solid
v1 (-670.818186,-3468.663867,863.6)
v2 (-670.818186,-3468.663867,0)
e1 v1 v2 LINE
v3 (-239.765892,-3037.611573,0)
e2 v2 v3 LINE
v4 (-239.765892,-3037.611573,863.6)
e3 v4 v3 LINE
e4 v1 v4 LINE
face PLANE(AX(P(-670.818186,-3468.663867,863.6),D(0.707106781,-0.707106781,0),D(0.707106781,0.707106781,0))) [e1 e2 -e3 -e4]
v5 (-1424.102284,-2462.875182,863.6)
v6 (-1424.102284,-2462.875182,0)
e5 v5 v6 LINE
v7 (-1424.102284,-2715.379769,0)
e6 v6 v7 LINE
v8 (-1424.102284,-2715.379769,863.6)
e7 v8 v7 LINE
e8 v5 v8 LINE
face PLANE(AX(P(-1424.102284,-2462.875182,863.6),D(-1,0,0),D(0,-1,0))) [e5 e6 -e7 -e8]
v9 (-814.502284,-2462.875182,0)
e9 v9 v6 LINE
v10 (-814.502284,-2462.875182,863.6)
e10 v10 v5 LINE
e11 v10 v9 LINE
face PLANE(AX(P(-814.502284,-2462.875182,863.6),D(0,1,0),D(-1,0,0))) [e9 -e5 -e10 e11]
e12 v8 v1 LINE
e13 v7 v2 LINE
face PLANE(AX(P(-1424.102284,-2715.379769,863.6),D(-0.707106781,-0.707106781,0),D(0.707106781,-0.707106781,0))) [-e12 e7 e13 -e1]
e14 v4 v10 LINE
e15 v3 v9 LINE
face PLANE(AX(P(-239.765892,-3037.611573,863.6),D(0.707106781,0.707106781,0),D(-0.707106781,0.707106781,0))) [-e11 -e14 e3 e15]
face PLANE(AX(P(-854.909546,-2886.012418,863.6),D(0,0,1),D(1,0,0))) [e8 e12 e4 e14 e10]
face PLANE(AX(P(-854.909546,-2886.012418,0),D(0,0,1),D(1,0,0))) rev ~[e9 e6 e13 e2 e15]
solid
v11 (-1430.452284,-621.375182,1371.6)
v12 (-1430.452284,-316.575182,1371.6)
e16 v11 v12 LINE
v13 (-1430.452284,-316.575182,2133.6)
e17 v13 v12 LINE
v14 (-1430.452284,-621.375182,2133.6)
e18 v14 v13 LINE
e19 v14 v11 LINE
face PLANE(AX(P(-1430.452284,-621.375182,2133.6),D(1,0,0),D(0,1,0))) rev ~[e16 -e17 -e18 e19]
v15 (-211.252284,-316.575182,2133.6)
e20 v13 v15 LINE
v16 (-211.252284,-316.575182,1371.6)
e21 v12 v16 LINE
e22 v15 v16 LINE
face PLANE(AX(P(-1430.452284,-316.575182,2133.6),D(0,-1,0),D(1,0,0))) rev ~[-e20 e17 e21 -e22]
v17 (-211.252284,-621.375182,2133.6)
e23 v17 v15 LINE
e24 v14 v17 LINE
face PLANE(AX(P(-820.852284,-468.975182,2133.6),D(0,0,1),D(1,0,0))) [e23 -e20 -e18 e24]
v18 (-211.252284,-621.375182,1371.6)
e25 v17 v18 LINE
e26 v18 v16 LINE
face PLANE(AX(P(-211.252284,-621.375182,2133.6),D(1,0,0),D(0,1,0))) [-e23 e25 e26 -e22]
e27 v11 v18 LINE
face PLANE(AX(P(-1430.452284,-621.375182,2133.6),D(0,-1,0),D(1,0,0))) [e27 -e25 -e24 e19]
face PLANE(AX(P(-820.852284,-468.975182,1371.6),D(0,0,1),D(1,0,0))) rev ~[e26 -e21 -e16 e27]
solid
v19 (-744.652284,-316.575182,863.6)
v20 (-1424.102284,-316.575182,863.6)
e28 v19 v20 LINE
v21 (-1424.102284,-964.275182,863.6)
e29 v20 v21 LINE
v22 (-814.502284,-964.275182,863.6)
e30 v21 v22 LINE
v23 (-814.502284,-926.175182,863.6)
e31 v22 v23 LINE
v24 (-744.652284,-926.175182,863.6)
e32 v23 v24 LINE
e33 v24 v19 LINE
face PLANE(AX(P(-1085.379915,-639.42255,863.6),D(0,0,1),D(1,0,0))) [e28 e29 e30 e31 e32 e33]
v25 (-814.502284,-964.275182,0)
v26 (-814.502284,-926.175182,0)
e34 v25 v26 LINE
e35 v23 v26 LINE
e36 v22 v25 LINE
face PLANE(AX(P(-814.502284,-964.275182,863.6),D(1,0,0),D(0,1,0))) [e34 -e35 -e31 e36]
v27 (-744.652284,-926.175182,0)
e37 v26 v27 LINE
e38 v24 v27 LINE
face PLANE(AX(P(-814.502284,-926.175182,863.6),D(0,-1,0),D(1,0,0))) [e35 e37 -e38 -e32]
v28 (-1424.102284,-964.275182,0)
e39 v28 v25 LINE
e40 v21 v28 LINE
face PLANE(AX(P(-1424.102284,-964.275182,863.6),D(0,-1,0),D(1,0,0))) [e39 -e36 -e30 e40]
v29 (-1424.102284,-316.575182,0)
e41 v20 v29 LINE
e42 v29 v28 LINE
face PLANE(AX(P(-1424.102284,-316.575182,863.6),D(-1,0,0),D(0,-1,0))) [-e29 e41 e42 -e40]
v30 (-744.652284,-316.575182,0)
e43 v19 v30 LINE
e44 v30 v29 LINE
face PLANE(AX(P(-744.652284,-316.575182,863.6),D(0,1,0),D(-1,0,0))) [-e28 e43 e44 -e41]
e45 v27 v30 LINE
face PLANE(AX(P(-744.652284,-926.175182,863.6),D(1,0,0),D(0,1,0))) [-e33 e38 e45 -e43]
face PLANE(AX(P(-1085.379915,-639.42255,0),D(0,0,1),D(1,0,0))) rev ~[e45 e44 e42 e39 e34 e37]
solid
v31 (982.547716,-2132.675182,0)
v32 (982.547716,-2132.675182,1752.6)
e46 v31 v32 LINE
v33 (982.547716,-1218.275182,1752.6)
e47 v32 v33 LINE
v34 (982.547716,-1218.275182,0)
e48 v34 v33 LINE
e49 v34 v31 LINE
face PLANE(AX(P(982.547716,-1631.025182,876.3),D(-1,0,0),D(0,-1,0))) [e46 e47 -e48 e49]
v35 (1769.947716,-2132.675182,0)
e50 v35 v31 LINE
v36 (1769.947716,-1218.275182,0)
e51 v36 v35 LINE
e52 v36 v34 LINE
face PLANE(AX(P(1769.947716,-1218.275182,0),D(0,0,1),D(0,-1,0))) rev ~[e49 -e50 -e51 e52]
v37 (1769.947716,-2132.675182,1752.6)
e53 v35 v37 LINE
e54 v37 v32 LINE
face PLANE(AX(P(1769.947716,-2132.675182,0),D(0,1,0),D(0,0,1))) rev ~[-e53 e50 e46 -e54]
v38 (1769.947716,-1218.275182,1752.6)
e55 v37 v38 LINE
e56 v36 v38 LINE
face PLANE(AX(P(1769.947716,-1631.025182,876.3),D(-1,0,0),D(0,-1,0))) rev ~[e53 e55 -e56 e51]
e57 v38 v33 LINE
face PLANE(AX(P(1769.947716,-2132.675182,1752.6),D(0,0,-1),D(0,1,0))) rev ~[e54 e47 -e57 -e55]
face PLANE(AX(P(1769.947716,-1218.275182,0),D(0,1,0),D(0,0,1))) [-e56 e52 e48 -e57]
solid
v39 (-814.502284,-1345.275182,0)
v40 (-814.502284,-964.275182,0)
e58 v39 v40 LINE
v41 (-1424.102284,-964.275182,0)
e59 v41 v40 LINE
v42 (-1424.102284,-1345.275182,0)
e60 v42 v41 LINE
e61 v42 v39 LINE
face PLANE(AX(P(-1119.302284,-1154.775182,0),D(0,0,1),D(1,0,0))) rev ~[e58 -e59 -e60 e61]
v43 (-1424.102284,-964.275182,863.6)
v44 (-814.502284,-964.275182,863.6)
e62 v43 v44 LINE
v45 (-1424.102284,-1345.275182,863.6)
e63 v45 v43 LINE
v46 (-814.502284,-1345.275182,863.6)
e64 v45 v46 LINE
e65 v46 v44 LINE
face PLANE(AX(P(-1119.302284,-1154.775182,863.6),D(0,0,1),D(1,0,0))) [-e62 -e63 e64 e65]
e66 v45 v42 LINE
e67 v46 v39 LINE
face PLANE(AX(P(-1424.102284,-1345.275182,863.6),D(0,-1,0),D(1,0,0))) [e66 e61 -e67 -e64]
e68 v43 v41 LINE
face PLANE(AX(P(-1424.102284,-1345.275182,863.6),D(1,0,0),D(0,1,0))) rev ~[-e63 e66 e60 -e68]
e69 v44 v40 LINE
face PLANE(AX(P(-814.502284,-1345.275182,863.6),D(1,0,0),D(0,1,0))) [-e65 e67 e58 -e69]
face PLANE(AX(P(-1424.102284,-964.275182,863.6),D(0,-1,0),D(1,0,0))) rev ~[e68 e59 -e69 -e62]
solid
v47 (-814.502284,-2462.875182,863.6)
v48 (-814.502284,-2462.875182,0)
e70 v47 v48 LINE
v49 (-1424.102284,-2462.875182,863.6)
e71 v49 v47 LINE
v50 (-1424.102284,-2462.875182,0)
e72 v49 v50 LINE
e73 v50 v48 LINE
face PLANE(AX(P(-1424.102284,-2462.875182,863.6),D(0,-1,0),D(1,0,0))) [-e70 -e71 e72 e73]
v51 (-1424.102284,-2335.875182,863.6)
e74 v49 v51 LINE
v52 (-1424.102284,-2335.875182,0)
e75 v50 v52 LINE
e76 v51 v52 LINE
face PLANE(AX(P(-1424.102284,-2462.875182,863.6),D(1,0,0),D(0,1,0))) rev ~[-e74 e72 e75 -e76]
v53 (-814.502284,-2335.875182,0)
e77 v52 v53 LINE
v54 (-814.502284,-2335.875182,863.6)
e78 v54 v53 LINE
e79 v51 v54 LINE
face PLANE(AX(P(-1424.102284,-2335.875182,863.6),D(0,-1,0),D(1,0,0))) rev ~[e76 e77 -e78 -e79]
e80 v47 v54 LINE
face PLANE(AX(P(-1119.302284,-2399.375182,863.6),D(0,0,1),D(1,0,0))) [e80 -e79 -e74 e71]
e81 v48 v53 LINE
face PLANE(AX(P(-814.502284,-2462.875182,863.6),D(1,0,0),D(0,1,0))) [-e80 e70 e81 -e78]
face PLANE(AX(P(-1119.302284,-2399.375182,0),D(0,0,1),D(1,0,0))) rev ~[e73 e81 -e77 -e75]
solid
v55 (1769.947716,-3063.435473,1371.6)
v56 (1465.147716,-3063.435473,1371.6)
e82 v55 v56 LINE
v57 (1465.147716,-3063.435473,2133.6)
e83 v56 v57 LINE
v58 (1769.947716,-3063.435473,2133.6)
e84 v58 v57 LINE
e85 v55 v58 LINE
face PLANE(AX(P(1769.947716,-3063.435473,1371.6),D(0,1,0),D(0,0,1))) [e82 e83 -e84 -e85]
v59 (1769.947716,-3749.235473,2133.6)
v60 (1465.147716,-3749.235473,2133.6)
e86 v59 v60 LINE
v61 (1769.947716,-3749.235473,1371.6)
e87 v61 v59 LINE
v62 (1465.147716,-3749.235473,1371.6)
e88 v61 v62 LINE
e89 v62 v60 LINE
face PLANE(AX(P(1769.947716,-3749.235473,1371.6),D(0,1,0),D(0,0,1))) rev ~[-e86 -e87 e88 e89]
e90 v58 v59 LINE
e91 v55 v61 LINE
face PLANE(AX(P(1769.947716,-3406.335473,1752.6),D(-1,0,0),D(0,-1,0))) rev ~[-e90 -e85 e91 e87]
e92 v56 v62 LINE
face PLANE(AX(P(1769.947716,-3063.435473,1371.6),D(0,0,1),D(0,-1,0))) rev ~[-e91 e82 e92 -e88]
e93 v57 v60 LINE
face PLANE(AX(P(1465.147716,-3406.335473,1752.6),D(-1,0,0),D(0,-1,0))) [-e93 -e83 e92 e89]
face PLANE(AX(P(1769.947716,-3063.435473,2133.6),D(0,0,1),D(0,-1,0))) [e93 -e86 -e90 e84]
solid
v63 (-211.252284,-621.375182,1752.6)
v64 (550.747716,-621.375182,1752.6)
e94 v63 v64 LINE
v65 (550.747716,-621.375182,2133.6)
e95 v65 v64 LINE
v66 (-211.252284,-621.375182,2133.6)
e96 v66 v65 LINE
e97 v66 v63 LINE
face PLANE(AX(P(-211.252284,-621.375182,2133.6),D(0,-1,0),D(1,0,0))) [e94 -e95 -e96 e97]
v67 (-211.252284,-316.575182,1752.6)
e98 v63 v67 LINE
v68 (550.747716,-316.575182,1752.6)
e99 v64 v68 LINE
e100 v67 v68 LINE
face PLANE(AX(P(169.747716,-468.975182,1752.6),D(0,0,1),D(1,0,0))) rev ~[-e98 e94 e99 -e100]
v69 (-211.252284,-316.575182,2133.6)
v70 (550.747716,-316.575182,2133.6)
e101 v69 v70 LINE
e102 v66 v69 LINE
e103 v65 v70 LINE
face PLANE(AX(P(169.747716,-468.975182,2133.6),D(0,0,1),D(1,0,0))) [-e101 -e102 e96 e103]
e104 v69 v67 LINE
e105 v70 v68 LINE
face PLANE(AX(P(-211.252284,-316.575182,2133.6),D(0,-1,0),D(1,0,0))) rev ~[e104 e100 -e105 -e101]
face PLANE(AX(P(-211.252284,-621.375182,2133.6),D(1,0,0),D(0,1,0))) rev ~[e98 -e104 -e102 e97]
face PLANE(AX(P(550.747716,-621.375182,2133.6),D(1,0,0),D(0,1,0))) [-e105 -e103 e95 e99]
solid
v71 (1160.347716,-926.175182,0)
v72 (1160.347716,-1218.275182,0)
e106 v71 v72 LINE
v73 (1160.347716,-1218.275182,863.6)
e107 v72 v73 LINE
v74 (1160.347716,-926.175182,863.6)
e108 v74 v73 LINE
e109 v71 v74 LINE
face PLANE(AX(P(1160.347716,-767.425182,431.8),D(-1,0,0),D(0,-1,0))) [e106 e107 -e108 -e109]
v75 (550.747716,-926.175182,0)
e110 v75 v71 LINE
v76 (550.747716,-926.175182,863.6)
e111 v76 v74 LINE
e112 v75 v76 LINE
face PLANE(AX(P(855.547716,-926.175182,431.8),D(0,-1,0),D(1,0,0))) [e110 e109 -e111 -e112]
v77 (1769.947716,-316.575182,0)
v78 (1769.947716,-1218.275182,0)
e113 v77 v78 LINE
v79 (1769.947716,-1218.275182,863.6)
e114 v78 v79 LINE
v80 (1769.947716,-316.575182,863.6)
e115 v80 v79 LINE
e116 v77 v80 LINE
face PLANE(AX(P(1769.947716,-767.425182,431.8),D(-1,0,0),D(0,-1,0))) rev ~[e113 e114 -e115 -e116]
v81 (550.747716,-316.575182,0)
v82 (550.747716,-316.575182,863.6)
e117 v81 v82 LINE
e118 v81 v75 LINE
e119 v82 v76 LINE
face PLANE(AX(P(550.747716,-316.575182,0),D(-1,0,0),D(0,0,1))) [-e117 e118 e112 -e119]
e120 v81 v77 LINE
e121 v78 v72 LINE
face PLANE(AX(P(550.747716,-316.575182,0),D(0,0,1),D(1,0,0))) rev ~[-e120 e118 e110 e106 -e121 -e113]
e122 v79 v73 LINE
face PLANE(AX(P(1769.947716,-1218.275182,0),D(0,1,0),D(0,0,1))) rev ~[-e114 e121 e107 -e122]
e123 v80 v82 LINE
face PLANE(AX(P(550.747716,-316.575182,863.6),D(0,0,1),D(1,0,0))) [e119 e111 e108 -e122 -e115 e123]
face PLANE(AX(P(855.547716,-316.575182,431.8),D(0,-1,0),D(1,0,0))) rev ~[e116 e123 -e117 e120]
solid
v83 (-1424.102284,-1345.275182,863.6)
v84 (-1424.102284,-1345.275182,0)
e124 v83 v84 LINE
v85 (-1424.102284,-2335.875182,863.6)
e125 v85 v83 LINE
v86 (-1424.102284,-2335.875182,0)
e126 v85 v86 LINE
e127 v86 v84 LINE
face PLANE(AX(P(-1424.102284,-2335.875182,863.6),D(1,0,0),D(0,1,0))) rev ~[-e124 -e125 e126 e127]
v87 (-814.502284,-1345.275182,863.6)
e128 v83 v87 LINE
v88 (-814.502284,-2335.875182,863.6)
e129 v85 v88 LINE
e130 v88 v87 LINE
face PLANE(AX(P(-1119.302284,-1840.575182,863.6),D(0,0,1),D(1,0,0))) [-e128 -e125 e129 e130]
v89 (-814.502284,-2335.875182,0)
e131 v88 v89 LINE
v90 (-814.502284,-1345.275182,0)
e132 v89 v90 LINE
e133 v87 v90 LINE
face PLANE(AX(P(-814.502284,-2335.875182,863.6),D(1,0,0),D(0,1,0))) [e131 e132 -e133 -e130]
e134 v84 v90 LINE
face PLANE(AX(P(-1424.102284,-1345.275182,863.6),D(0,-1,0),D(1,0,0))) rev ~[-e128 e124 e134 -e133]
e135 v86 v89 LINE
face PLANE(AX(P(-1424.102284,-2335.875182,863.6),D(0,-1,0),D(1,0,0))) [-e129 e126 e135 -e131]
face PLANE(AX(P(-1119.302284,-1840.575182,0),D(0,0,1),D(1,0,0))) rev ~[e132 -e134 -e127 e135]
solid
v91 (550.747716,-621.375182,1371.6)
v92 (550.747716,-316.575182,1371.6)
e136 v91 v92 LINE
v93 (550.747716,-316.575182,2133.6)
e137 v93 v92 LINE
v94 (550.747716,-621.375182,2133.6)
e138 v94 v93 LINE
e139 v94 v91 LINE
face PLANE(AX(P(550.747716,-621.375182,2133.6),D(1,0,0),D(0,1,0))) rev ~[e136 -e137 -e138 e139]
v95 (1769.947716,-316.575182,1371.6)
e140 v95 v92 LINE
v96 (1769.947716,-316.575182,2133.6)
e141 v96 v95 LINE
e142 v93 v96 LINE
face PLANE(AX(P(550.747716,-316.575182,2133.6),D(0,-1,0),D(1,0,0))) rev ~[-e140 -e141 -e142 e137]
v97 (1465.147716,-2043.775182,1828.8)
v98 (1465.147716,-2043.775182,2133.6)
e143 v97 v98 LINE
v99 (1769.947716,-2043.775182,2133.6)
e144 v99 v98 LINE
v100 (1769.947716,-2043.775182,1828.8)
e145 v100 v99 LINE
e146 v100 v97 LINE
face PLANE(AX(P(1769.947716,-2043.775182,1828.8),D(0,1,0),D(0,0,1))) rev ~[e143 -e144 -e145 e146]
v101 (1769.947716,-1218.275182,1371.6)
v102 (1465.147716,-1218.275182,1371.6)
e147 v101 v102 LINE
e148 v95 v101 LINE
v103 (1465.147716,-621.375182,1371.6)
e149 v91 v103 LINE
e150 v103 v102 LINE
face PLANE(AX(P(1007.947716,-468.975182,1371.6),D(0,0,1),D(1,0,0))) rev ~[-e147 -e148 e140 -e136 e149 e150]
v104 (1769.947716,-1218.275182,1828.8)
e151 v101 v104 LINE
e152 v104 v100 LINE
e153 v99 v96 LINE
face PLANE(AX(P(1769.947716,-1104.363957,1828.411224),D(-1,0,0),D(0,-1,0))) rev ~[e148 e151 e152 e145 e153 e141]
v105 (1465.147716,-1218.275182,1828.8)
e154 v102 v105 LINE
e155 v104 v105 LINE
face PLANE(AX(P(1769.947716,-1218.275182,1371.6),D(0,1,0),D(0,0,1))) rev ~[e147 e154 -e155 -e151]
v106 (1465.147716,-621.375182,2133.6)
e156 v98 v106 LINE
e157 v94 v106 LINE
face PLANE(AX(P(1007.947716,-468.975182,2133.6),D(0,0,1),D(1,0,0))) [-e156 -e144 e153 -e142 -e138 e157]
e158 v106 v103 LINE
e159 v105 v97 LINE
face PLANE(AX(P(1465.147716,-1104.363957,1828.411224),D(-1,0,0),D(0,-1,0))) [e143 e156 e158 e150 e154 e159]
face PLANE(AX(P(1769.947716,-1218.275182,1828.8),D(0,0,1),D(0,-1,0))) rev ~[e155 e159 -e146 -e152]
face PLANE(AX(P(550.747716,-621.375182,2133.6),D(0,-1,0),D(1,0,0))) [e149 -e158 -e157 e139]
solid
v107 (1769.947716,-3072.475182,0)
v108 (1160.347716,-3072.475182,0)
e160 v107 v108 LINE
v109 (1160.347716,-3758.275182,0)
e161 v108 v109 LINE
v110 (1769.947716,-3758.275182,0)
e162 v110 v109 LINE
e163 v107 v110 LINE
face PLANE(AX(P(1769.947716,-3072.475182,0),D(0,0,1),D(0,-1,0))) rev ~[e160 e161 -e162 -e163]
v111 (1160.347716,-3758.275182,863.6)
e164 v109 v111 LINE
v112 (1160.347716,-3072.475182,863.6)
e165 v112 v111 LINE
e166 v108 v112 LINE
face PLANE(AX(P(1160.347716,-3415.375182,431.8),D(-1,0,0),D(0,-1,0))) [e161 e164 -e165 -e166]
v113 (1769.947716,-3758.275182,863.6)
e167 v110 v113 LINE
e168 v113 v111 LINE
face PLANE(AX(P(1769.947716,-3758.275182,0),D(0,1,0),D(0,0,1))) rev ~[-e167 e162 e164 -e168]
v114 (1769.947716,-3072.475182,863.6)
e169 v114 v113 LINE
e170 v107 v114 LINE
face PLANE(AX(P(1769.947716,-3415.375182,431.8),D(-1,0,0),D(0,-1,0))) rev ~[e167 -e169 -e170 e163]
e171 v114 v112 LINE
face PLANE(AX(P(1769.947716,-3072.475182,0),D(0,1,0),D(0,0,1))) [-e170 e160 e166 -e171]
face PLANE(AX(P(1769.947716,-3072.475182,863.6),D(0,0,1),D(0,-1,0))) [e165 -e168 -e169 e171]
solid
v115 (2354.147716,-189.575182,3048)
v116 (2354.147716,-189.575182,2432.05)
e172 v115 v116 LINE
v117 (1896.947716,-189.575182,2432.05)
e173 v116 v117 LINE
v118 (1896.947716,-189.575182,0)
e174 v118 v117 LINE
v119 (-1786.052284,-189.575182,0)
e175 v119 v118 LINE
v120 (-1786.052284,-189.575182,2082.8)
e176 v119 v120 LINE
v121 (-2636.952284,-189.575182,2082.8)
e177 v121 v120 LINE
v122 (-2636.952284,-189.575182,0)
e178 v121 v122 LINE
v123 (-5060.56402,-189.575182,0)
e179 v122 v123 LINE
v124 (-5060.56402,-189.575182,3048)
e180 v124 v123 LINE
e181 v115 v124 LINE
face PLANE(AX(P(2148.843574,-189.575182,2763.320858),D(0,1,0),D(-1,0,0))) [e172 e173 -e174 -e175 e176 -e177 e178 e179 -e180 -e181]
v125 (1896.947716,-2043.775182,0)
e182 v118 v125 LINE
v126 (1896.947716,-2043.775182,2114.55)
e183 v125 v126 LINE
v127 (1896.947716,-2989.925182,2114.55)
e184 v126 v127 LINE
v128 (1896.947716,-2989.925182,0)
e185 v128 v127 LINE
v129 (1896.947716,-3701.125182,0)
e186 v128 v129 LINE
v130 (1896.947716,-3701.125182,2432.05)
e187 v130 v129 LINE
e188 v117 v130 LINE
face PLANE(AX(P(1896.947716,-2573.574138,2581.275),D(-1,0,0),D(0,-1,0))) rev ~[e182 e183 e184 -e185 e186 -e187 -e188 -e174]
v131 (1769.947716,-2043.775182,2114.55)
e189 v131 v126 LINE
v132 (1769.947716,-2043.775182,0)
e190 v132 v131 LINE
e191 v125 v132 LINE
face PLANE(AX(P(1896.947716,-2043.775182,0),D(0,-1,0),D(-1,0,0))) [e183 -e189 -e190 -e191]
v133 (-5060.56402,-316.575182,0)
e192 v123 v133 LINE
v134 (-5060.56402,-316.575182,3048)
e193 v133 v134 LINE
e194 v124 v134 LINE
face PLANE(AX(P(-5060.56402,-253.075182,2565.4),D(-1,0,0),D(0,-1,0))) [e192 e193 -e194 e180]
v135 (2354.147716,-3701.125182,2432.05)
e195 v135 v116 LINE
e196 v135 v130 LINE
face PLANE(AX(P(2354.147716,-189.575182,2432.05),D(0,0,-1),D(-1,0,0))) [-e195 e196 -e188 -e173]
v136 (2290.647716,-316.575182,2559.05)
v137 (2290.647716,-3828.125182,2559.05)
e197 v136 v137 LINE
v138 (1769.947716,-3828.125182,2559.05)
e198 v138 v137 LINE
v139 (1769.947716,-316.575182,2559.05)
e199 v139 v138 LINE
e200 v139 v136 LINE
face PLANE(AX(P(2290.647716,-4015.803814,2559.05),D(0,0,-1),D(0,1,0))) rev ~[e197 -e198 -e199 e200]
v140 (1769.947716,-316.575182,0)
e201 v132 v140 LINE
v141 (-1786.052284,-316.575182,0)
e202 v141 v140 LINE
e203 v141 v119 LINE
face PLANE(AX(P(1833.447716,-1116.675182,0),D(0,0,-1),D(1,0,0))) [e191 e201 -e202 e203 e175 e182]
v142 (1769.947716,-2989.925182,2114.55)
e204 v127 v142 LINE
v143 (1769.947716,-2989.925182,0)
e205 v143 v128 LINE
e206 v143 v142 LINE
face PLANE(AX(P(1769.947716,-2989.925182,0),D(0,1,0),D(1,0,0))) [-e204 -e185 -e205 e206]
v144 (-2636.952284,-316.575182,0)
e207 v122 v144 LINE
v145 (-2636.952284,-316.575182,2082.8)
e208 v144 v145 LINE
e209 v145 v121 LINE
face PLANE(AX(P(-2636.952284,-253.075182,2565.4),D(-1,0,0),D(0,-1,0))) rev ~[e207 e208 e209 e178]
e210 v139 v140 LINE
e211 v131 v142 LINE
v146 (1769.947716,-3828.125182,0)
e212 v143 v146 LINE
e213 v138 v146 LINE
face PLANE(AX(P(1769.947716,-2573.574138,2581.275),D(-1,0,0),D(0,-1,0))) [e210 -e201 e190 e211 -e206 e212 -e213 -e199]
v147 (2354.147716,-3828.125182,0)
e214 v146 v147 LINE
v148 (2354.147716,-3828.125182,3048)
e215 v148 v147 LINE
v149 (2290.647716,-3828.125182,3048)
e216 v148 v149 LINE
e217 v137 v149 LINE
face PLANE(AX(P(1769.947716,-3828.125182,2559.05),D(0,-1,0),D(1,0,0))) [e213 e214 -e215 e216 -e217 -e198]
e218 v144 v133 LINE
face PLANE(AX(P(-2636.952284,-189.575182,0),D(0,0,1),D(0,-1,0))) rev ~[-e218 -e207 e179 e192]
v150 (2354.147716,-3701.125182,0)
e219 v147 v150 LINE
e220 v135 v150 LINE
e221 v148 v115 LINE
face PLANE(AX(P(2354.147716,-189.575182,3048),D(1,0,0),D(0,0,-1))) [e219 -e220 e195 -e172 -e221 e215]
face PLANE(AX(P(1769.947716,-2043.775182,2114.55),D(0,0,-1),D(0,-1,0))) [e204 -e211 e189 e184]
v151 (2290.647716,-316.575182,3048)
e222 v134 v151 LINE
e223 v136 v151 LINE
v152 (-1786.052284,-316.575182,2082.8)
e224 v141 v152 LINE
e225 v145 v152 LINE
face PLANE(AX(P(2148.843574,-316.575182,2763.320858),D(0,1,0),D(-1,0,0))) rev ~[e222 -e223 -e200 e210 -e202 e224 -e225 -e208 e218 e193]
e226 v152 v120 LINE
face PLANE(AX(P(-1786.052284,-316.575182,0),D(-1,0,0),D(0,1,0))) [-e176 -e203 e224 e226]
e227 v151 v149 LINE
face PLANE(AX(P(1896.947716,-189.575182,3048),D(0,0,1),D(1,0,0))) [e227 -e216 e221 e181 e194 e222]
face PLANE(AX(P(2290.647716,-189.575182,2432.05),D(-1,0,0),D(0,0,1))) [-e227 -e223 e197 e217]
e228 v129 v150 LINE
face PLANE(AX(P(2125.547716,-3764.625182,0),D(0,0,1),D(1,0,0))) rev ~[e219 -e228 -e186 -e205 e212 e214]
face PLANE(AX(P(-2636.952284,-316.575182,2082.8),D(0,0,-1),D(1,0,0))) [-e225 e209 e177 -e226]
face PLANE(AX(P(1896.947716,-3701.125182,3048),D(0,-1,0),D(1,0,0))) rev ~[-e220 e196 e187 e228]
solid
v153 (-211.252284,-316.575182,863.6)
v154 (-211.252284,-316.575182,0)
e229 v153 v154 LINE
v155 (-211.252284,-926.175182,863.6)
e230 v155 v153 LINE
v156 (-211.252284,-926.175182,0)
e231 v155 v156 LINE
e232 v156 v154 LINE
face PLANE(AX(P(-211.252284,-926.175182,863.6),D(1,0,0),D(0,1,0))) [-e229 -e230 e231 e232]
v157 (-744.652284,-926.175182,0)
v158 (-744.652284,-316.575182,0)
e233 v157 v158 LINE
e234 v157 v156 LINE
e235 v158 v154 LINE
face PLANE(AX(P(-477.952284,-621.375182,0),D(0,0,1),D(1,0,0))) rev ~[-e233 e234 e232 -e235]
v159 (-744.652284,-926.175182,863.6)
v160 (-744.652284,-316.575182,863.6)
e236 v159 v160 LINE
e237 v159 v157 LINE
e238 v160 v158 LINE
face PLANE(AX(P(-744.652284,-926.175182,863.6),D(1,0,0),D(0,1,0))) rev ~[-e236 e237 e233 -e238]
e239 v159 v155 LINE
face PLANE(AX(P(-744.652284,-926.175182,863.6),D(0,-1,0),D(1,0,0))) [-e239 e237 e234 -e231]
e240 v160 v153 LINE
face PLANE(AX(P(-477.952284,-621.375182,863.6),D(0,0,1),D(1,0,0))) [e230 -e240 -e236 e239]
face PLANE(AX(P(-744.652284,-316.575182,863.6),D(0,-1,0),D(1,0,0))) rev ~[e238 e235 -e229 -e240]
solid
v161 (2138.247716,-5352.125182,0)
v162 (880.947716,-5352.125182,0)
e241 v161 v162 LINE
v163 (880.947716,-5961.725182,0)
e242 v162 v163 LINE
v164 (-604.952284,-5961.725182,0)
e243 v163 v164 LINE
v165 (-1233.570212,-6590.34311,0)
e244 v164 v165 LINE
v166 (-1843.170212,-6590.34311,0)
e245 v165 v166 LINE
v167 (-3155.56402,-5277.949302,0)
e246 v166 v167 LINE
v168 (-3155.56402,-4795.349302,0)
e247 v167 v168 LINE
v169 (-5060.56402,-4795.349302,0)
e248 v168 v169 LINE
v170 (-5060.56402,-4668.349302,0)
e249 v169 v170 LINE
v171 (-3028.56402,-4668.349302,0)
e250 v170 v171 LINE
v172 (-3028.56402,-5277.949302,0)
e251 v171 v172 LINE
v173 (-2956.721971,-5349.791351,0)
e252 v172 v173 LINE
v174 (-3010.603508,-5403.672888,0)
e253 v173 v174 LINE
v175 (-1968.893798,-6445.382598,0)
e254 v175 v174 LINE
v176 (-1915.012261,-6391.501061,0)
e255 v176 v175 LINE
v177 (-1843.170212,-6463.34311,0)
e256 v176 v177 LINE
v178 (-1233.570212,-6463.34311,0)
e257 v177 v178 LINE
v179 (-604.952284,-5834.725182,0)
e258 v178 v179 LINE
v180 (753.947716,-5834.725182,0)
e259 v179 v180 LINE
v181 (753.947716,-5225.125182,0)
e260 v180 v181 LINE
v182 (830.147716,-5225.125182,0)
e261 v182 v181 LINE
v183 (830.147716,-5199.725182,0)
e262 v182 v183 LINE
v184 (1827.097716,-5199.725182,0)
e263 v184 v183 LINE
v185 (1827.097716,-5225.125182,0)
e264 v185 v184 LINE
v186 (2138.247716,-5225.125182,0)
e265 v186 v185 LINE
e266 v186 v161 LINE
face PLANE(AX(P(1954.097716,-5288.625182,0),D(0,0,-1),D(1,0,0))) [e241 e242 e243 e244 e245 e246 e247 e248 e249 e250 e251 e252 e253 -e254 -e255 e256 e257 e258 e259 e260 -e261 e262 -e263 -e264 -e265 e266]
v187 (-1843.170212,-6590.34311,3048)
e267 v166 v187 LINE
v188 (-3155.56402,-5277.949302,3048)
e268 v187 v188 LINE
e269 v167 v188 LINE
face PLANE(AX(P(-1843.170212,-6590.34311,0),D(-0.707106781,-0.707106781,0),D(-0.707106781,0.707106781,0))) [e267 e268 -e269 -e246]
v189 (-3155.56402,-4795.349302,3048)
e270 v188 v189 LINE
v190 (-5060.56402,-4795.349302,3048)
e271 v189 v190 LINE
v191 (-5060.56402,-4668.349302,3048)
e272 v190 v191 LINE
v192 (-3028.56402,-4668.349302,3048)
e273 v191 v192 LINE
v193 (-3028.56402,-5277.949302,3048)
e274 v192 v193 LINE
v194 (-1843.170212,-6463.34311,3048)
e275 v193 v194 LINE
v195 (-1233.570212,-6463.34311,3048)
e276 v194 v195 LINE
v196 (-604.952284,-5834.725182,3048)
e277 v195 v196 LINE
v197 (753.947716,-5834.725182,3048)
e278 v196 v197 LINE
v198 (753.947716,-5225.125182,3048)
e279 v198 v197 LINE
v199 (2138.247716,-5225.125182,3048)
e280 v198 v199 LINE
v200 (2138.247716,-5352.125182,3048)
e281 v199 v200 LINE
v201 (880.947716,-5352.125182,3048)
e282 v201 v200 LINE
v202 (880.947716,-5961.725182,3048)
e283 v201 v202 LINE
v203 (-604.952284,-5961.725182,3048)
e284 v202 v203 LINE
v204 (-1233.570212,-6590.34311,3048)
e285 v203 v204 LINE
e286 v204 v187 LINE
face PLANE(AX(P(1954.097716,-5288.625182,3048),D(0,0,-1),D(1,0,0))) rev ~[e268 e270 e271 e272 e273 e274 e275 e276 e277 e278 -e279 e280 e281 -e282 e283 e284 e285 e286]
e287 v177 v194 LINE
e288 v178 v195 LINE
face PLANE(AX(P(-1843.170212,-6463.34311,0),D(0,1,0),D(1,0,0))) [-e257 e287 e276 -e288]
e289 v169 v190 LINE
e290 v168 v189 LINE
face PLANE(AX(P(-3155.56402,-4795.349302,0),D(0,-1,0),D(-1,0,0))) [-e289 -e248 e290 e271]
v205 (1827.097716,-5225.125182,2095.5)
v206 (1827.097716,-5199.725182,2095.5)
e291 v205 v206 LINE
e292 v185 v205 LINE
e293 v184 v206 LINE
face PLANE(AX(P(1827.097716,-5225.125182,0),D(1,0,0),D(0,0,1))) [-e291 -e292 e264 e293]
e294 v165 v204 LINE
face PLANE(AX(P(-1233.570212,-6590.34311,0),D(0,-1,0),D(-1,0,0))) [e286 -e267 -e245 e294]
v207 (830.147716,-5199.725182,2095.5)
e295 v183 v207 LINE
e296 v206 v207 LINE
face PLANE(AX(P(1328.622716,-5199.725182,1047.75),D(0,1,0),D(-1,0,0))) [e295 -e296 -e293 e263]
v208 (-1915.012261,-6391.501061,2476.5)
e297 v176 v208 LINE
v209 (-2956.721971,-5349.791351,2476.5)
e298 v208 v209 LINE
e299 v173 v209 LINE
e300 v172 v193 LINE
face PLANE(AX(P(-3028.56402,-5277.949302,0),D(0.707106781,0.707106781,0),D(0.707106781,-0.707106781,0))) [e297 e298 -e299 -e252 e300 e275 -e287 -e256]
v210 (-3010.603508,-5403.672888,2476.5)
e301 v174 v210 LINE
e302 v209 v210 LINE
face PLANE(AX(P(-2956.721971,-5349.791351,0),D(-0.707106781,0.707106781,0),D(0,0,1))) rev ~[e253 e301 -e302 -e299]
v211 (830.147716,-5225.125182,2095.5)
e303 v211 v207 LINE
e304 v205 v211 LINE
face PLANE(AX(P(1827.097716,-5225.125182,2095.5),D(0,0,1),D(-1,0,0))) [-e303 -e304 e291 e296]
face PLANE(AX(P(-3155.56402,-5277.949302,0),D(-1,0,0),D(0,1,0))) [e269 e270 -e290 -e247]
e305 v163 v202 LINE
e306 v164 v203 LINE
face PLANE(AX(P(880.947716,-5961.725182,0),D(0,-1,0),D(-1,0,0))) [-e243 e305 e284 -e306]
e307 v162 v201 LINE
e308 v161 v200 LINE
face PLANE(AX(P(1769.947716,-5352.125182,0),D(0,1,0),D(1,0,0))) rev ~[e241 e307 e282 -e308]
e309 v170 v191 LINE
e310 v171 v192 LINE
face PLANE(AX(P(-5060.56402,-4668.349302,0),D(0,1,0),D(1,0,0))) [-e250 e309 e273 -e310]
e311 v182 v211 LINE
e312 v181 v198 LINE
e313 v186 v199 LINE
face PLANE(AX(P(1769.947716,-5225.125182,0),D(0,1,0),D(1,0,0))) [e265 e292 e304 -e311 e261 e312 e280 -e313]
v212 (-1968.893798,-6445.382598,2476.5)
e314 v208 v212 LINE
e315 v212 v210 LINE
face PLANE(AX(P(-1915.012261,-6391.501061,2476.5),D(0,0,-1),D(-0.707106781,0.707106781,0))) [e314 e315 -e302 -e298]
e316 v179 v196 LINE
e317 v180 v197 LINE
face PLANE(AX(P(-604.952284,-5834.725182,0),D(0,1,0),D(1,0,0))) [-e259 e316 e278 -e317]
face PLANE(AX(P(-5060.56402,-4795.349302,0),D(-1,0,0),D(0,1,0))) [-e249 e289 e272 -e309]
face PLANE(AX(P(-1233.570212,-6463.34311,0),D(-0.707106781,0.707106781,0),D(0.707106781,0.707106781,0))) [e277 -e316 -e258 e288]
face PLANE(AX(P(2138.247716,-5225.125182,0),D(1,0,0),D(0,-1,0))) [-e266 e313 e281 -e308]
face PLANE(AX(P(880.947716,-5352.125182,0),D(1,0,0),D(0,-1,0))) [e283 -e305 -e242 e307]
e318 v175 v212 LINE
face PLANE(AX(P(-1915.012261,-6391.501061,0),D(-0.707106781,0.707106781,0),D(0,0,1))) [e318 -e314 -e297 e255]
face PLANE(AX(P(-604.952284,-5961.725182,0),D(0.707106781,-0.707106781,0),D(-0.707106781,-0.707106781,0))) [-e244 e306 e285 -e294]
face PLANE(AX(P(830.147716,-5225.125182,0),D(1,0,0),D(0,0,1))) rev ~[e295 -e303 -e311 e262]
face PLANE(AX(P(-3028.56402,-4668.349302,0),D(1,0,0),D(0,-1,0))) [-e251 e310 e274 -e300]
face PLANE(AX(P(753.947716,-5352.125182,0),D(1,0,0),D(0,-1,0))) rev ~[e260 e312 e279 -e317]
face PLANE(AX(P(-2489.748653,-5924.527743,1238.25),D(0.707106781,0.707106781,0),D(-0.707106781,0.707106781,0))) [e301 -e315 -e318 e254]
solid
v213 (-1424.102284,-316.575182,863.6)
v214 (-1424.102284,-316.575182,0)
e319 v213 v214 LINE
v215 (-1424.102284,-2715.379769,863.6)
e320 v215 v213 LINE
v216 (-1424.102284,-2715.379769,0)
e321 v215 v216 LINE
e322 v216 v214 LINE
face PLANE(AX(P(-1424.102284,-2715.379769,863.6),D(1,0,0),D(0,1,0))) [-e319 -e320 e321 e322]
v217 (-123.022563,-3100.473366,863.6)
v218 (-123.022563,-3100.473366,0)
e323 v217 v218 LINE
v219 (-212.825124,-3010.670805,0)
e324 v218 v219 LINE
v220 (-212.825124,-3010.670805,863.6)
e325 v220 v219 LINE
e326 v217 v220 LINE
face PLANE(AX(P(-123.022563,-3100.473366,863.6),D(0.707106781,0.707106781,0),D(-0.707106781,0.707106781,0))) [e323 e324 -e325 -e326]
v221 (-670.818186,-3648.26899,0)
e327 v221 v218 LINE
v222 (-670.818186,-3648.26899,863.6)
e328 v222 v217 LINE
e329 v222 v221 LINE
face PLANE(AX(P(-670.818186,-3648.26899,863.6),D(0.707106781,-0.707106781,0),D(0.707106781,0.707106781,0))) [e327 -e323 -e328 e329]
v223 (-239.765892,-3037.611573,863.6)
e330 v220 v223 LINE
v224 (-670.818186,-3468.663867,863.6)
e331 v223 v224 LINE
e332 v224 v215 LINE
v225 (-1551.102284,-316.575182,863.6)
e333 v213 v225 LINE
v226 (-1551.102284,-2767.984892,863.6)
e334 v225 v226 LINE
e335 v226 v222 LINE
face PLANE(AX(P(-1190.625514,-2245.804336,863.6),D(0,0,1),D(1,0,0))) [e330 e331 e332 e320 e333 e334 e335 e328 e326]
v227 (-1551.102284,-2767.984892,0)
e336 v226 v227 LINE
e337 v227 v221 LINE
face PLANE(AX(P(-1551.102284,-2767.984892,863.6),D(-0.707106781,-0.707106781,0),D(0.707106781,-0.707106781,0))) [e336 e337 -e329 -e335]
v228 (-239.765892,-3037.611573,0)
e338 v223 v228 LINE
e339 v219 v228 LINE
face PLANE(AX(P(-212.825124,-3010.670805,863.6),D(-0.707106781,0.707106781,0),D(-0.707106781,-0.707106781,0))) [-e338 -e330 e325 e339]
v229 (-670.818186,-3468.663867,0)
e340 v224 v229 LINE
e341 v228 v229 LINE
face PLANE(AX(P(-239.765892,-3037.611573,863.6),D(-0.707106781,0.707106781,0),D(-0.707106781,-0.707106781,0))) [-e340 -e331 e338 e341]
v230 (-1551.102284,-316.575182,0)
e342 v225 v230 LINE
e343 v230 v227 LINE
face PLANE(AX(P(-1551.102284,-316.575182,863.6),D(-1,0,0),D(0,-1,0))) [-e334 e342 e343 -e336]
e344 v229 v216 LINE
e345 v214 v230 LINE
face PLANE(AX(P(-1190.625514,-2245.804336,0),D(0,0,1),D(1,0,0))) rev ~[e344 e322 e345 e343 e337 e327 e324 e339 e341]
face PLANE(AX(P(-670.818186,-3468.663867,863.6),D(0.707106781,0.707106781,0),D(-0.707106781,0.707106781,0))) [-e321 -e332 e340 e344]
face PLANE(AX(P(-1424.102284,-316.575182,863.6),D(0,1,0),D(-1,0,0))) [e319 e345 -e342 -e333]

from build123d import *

# Parameters (mm, degrees)
F0_W      = 3556
F0_H      = 127
F1_DEPTH  = 3048
F3_DEPTH  = 3048
F4_W      = 127
F4_H      = 838.2
F5_DEPTH  = 3048
F6_W      = 1016
F6_H      = 127
F7_DEPTH  = 3048
F8_W      = 127
F8_H      = 482.6
F9_DEPTH  = 3048
F10_W     = 368.3
F10_H     = 127
F11_DEPTH = 3048
F12_W     = 996.95
F12_H     = 2095.5
F13_DEPTH = 25.4
F14_W     = 850.9
F14_H     = 965.2
F15_DEPTH = 127
F16_W     = 127
F16_H     = 965.2
F16_H_2   = 2082.8
F17_DEPTH = 2423.611736456
F18_W     = 1059.5979121052
F18_H     = 933.45
F19_DEPTH = 127
F21_W     = 457.2
F21_H     = 127
F22_DEPTH = 3048
F24_W     = 520.7
F24_H     = 3638.55
F25_DEPTH = 127
F26_W     = 3699.2286321938
F26_H     = 1626.0209083557
F27_DEPTH = 1270
F29_DEPTH = 127
F30_W     = 63.5
F30_H     = 615.95
F31_DEPTH = 3511.55
F32_W     = 685.8
F32_H     = 863.6
F33_DEPTH = 609.6
F34_W     = 685.8
F34_H     = 762
F35_DEPTH = 304.8
F36_W     = 901.7
F36_H     = 863.6
F37_DEPTH = 609.6
F38_W     = 825.5
F38_H     = 1752.6
F38_W_2   = 88.9
F39_DEPTH = 787.4
F40_W     = 609.6
F40_H     = 863.6
F41_DEPTH = 609.6
F45_DEPTH = 304.8
F46_W     = 1473.2
F46_H     = 2476.5
F47_DEPTH = 76.2
F48_W     = 914.4
F48_H     = 304.8
F49_DEPTH = 762
F50_W     = 762
F50_H     = 304.8
F51_DEPTH = 381
F52_W     = 1219.2
F52_H     = 304.8
F53_DEPTH = 762
F54_W     = 533.4
F54_H     = 609.6
F55_DEPTH = 863.6
F57_DEPTH = 863.6
F58_W     = 609.6
F58_H     = 381
F59_DEPTH = 863.6
F60_W     = 609.6
F60_H     = 990.6
F61_DEPTH = 863.6
F62_W     = 609.6
F62_H     = 127
F63_DEPTH = 863.6
F65_DEPTH = 863.6
F67_DEPTH = 863.6


with BuildPart() as f1:
    # F0 (on Top) → F1 (new body)
    with BuildSketch(Plane.XY):
        with Locations((-8.052283898, -253.0751817405)):
            Rectangle(F0_W, F0_H)
    extrude(amount=F1_DEPTH)

    # F2 (on face) → F3 (join, through all)
    with BuildSketch(Plane(origin=(0, 0, 0), x_dir=(1, 0, 0), z_dir=(0, 0, -1))):
        Polygon((1769.947716102, 2043.7751817405), (1769.947716102, 316.5751817405), (1769.947716102, 189.5751817405), (1896.947716102, 189.5751817405), (1896.947716102, 2043.7751817405), align=None)
    extrude(amount=-F3_DEPTH)

    # F14 (on face) → F15 (join, through all)
    with BuildSketch(Plane.XZ.offset(316.5751817405)):
        with Locations((-2211.502283898, 2565.4)):
            Rectangle(F14_W, F14_H)
    extrude(amount=-F15_DEPTH)

    # F16 (on face) → F17 (join, through all)
    with BuildSketch(Plane(origin=(-2636.952283898, 0, 0), x_dir=(0, -1, 0), z_dir=(-1, 0, 0))):
        with Locations((253.0751817405, 2565.4)):
            Rectangle(F16_W, F16_H)
        with Locations((253.0751817405, 1041.4)):
            Rectangle(F16_W, F16_H_2)
    extrude(amount=F17_DEPTH)



with BuildPart() as f5:
    # F4 (on face) → F5 (new body, through all)
    with BuildSketch(Plane(origin=(0, 0, 0), x_dir=(1, 0, 0), z_dir=(0, 0, -1))):
        with Locations((1833.447716102, 3409.0251817405)):
            Rectangle(F4_W, F4_H)
    extrude(amount=-F5_DEPTH)


with BuildPart() as f7:
    # F6 (on face) → F7 (new body, through all)
    with BuildSketch(Plane(origin=(0, 0, 0), x_dir=(1, 0, 0), z_dir=(0, 0, -1))):
        with Locations((1261.947716102, 5288.6251817405)):
            Rectangle(F6_W, F6_H)
    extrude(amount=-F7_DEPTH)

    # F8 (on face) → F9 (join, through all)
    with BuildSketch(Plane(origin=(0, 0, 0), x_dir=(1, 0, 0), z_dir=(0, 0, -1))):
        Polygon((-3028.564020354, 5277.9493022342), (-1843.1702123728, 6463.3431102153), (-1843.1702123728, 6590.3431102153), (-3155.564020354, 5277.9493022342), (-3155.564020354, 4795.3493022342), (-5060.564020354, 4795.3493022342), (-5060.564020354, 4668.3493022342), (-3028.564020354, 4668.3493022342), align=None)
        Polygon((-1233.5702123728, 6463.3431102153), (-604.952283898, 5834.7251817405), (-604.952283898, 5961.7251817405), (-1233.5702123728, 6590.3431102153), (-1843.1702123728, 6590.3431102153), (-1843.1702123728, 6463.3431102153), align=None)
        Polygon((-604.952283898, 5834.7251817405), (753.947716102, 5834.7251817405), (880.947716102, 5834.7251817405), (880.947716102, 5961.7251817405), (-604.952283898, 5961.7251817405), align=None)
        with Locations((817.447716102, 5593.4251817405)):
            Rectangle(F8_W, F8_H)
    extrude(amount=-F9_DEPTH)

    # F10 (on face) → F11 (join, through all)
    with BuildSketch(Plane(origin=(0, 0, 0), x_dir=(1, 0, 0), z_dir=(0, 0, -1))):
        with Locations((1954.097716102, 5288.6251817405)):
            Rectangle(F10_W, F10_H)
    extrude(amount=-F11_DEPTH)

    # F12 (on face) → F13 (join)
    with BuildSketch(Plane(origin=(0, -5225.1251817405, 0), x_dir=(-1, 0, 0), z_dir=(0, 1, 0))):
        with Locations((-1328.622716102, 1047.75)):
            Rectangle(F12_W, F12_H)
    extrude(amount=F13_DEPTH)

    # F46 (on face) → F47 (cut)
    with BuildSketch(Plane(origin=(-4153.2566612941, -4153.2566612941, 0), x_dir=(-0.7071067812, 0.7071067812, 0), z_dir=(0.7071067812, 0.7071067812, 0))):
        with Locations((-2428.7555863187, 1238.25)):
            Rectangle(F46_W, F46_H)
    extrude(amount=-F47_DEPTH, mode=Mode.SUBTRACT)


with BuildPart() as f1_1:
    add(f1.part)

    add(f5.part)  # F19 merges F5
    # F18 (on face) → F19 (join, through all)
    with BuildSketch(Plane(origin=(1769.947716102, 0, 0), x_dir=(0, -1, 0), z_dir=(-1, 0, 0))):
        with Locations((2573.5741377931, 2581.275)):
            Rectangle(F18_W, F18_H)
    extrude(amount=-F19_DEPTH)

    # F20: union 

    # F21 (on face) → F22 (join, through all)
    with BuildSketch(Plane.XY.offset(3048)):
        with Locations((2125.547716102, -3764.6251817405)):
            Rectangle(F21_W, F21_H)
    extrude(amount=-F22_DEPTH)

    # F24 (on offset) → F25 (join)
    with BuildSketch(Plane(origin=(0, 0, 2559.05), x_dir=(1, 0, 0), z_dir=(0, 0, -1))):
        with Locations((2030.297716102, 2008.8501817405)):
            Rectangle(F24_W, F24_H)
    extrude(amount=F25_DEPTH)

    # F26 (on face) → F27 (cut)
    with BuildSketch(Plane.YZ.offset(2290.647716102)):
        with Locations((-2166.1894978374, 3372.0604541779)):
            Rectangle(F26_W, F26_H)
    extrude(amount=-F27_DEPTH, mode=Mode.SUBTRACT)

    # F28 (on face) → F29 (join, through all)
    with BuildSketch(Plane(origin=(0, -189.5751817405, 0), x_dir=(-1, 0, 0), z_dir=(0, 1, 0))):
        Polygon((-1896.947716102, 2559.05), (-1896.947716102, 3048), (-2354.147716102, 3048), (-2354.147716102, 2432.05), (-2290.647716102, 2432.05), (-2290.647716102, 2559.05), align=None)
    extrude(amount=-F29_DEPTH)

    # F30 (on face) → F31 (join, through all)
    with BuildSketch(Plane(origin=(0, -189.5751817405, 0), x_dir=(-1, 0, 0), z_dir=(0, 1, 0))):
        with Locations((-2322.397716102, 2740.025)):
            Rectangle(F30_W, F30_H)
    extrude(amount=-F31_DEPTH)


with BuildPart() as f33:
    # F32 (on face) → F33 (new body)
    with BuildSketch(Plane(origin=(1769.947716102, 0, 0), x_dir=(0, -1, 0), z_dir=(-1, 0, 0))):
        with Locations((3415.3751817405, 431.8)):
            Rectangle(F32_W, F32_H)
    extrude(amount=F33_DEPTH)


with BuildPart() as f35:
    # F34 (on face) → F35 (new body)
    with BuildSketch(Plane(origin=(1769.947716102, 0, 0), x_dir=(0, -1, 0), z_dir=(-1, 0, 0))):
        with Locations((3406.3354730606, 1752.6)):
            Rectangle(F34_W, F34_H)
    extrude(amount=F35_DEPTH)


with BuildPart() as f37:
    # F36 (on face) → F37 (new body)
    with BuildSketch(Plane(origin=(1769.947716102, 0, 0), x_dir=(0, -1, 0), z_dir=(-1, 0, 0))):
        with Locations((767.4251817405, 431.8)):
            Rectangle(F36_W, F36_H)
    extrude(amount=F37_DEPTH)

    # F40 (on face) → F41 (join)
    with BuildSketch(Plane.XZ.offset(316.5751817405)):
        with Locations((855.547716102, 431.8)):
            Rectangle(F40_W, F40_H)
    extrude(amount=F41_DEPTH)


with BuildPart() as f39:
    # F38 (on face) → F39 (new body)
    with BuildSketch(Plane(origin=(1769.947716102, 0, 0), x_dir=(0, -1, 0), z_dir=(-1, 0, 0))):
        with Locations((1631.0251817405, 876.3)):
            Rectangle(F38_W, F38_H)
        with Locations((2088.2251817405, 876.3)):
            Rectangle(F38_W_2, F38_H)
    extrude(amount=F39_DEPTH)


with BuildPart() as f45:
    # F44 (on face) → F45 (new body, through all)
    with BuildSketch(Plane(origin=(1769.947716102, 0, 0), x_dir=(0, -1, 0), z_dir=(-1, 0, 0))):
        Polygon((2043.7751817405, 2114.55), (2043.7751817405, 2133.6), (316.5751817405, 2133.6), (316.5751817405, 1371.6), (1218.2751817405, 1371.6), (1218.2751817405, 1828.8), (2043.7751817405, 1828.8), align=None)
    extrude(amount=F45_DEPTH)

    # F48 (on face) → F49 (join, through all)
    with BuildSketch(Plane.XY.offset(2133.6)):
        with Locations((1007.947716102, -468.9751817405)):
            Rectangle(F48_W, F48_H)
    extrude(amount=-F49_DEPTH)


with BuildPart() as f51:
    # F50 (on face) → F51 (new body)
    with BuildSketch(Plane.XY.offset(2133.6)):
        with Locations((169.747716102, -468.9751817405)):
            Rectangle(F50_W, F50_H)
    extrude(amount=-F51_DEPTH)


with BuildPart() as f53:
    # F52 (on face) → F53 (new body, through all)
    with BuildSketch(Plane.XY.offset(2133.6)):
        with Locations((-820.852283898, -468.9751817405)):
            Rectangle(F52_W, F52_H)
    extrude(amount=-F53_DEPTH)


with BuildPart() as f55:
    # F54 (on face) → F55 (new body, through all)
    with BuildSketch(Plane.XY.offset(863.6)):
        with Locations((-477.952283898, -621.3751817405)):
            Rectangle(F54_W, F54_H)
    extrude(amount=-F55_DEPTH)


with BuildPart() as f57:
    # F56 (on face) → F57 (new body, through all)
    with BuildSketch(Plane.XY.offset(863.6)):
        Polygon((-814.502283898, -926.1751817405), (-744.652283898, -926.1751817405), (-744.652283898, -316.5751817405), (-1424.102283898, -316.5751817405), (-1424.102283898, -964.2751817405), (-814.502283898, -964.2751817405), align=None)
    extrude(amount=-F57_DEPTH)


with BuildPart() as f59:
    # F58 (on face) → F59 (new body, through all)
    with BuildSketch(Plane.XY.offset(863.6)):
        with Locations((-1119.302283898, -1154.7751817405)):
            Rectangle(F58_W, F58_H)
    extrude(amount=-F59_DEPTH)


with BuildPart() as f61:
    # F60 (on face) → F61 (new body, through all)
    with BuildSketch(Plane.XY.offset(863.6)):
        with Locations((-1119.302283898, -1840.5751817405)):
            Rectangle(F60_W, F60_H)
    extrude(amount=-F61_DEPTH)


with BuildPart() as f63:
    # F62 (on face) → F63 (new body, through all)
    with BuildSketch(Plane.XY.offset(863.6)):
        with Locations((-1119.302283898, -2399.3751817405)):
            Rectangle(F62_W, F62_H)
    extrude(amount=-F63_DEPTH)


with BuildPart() as f65:
    # F64 (on face) → F65 (new body, through all)
    with BuildSketch(Plane.XY.offset(863.6)):
        Polygon((-239.7658921496, -3037.6115734889), (-814.502283898, -2462.8751817405), (-1424.102283898, -2462.8751817405), (-1424.102283898, -2715.3797693631), (-670.8181859609, -3468.6638673002), align=None)
    extrude(amount=-F65_DEPTH)


with BuildPart() as f67:
    # F66 (on face) → F67 (new body, through all)
    with BuildSketch(Plane.XY.offset(863.6)):
        Polygon((-212.8251237863, -3010.6708051257), (-239.7658921496, -3037.6115734889), (-670.8181859609, -3468.6638673002), (-1424.102283898, -2715.3797693631), (-1424.102283898, -2462.8751817405), (-1424.102283898, -316.5751817405), (-1551.102283898, -316.5751817405), (-1551.102283898, -2767.9848917845), (-670.8181859609, -3648.2689897216), (-123.0225625757, -3100.4733663364), align=None)
    extrude(amount=-F67_DEPTH)


solid = Compound([f7.part, f1_1.part, f33.part, f35.part, f37.part, f39.part, f45.part, f51.part, f53.part, f55.part, f57.part, f59.part, f61.part, f63.part, f65.part, f67.part])
